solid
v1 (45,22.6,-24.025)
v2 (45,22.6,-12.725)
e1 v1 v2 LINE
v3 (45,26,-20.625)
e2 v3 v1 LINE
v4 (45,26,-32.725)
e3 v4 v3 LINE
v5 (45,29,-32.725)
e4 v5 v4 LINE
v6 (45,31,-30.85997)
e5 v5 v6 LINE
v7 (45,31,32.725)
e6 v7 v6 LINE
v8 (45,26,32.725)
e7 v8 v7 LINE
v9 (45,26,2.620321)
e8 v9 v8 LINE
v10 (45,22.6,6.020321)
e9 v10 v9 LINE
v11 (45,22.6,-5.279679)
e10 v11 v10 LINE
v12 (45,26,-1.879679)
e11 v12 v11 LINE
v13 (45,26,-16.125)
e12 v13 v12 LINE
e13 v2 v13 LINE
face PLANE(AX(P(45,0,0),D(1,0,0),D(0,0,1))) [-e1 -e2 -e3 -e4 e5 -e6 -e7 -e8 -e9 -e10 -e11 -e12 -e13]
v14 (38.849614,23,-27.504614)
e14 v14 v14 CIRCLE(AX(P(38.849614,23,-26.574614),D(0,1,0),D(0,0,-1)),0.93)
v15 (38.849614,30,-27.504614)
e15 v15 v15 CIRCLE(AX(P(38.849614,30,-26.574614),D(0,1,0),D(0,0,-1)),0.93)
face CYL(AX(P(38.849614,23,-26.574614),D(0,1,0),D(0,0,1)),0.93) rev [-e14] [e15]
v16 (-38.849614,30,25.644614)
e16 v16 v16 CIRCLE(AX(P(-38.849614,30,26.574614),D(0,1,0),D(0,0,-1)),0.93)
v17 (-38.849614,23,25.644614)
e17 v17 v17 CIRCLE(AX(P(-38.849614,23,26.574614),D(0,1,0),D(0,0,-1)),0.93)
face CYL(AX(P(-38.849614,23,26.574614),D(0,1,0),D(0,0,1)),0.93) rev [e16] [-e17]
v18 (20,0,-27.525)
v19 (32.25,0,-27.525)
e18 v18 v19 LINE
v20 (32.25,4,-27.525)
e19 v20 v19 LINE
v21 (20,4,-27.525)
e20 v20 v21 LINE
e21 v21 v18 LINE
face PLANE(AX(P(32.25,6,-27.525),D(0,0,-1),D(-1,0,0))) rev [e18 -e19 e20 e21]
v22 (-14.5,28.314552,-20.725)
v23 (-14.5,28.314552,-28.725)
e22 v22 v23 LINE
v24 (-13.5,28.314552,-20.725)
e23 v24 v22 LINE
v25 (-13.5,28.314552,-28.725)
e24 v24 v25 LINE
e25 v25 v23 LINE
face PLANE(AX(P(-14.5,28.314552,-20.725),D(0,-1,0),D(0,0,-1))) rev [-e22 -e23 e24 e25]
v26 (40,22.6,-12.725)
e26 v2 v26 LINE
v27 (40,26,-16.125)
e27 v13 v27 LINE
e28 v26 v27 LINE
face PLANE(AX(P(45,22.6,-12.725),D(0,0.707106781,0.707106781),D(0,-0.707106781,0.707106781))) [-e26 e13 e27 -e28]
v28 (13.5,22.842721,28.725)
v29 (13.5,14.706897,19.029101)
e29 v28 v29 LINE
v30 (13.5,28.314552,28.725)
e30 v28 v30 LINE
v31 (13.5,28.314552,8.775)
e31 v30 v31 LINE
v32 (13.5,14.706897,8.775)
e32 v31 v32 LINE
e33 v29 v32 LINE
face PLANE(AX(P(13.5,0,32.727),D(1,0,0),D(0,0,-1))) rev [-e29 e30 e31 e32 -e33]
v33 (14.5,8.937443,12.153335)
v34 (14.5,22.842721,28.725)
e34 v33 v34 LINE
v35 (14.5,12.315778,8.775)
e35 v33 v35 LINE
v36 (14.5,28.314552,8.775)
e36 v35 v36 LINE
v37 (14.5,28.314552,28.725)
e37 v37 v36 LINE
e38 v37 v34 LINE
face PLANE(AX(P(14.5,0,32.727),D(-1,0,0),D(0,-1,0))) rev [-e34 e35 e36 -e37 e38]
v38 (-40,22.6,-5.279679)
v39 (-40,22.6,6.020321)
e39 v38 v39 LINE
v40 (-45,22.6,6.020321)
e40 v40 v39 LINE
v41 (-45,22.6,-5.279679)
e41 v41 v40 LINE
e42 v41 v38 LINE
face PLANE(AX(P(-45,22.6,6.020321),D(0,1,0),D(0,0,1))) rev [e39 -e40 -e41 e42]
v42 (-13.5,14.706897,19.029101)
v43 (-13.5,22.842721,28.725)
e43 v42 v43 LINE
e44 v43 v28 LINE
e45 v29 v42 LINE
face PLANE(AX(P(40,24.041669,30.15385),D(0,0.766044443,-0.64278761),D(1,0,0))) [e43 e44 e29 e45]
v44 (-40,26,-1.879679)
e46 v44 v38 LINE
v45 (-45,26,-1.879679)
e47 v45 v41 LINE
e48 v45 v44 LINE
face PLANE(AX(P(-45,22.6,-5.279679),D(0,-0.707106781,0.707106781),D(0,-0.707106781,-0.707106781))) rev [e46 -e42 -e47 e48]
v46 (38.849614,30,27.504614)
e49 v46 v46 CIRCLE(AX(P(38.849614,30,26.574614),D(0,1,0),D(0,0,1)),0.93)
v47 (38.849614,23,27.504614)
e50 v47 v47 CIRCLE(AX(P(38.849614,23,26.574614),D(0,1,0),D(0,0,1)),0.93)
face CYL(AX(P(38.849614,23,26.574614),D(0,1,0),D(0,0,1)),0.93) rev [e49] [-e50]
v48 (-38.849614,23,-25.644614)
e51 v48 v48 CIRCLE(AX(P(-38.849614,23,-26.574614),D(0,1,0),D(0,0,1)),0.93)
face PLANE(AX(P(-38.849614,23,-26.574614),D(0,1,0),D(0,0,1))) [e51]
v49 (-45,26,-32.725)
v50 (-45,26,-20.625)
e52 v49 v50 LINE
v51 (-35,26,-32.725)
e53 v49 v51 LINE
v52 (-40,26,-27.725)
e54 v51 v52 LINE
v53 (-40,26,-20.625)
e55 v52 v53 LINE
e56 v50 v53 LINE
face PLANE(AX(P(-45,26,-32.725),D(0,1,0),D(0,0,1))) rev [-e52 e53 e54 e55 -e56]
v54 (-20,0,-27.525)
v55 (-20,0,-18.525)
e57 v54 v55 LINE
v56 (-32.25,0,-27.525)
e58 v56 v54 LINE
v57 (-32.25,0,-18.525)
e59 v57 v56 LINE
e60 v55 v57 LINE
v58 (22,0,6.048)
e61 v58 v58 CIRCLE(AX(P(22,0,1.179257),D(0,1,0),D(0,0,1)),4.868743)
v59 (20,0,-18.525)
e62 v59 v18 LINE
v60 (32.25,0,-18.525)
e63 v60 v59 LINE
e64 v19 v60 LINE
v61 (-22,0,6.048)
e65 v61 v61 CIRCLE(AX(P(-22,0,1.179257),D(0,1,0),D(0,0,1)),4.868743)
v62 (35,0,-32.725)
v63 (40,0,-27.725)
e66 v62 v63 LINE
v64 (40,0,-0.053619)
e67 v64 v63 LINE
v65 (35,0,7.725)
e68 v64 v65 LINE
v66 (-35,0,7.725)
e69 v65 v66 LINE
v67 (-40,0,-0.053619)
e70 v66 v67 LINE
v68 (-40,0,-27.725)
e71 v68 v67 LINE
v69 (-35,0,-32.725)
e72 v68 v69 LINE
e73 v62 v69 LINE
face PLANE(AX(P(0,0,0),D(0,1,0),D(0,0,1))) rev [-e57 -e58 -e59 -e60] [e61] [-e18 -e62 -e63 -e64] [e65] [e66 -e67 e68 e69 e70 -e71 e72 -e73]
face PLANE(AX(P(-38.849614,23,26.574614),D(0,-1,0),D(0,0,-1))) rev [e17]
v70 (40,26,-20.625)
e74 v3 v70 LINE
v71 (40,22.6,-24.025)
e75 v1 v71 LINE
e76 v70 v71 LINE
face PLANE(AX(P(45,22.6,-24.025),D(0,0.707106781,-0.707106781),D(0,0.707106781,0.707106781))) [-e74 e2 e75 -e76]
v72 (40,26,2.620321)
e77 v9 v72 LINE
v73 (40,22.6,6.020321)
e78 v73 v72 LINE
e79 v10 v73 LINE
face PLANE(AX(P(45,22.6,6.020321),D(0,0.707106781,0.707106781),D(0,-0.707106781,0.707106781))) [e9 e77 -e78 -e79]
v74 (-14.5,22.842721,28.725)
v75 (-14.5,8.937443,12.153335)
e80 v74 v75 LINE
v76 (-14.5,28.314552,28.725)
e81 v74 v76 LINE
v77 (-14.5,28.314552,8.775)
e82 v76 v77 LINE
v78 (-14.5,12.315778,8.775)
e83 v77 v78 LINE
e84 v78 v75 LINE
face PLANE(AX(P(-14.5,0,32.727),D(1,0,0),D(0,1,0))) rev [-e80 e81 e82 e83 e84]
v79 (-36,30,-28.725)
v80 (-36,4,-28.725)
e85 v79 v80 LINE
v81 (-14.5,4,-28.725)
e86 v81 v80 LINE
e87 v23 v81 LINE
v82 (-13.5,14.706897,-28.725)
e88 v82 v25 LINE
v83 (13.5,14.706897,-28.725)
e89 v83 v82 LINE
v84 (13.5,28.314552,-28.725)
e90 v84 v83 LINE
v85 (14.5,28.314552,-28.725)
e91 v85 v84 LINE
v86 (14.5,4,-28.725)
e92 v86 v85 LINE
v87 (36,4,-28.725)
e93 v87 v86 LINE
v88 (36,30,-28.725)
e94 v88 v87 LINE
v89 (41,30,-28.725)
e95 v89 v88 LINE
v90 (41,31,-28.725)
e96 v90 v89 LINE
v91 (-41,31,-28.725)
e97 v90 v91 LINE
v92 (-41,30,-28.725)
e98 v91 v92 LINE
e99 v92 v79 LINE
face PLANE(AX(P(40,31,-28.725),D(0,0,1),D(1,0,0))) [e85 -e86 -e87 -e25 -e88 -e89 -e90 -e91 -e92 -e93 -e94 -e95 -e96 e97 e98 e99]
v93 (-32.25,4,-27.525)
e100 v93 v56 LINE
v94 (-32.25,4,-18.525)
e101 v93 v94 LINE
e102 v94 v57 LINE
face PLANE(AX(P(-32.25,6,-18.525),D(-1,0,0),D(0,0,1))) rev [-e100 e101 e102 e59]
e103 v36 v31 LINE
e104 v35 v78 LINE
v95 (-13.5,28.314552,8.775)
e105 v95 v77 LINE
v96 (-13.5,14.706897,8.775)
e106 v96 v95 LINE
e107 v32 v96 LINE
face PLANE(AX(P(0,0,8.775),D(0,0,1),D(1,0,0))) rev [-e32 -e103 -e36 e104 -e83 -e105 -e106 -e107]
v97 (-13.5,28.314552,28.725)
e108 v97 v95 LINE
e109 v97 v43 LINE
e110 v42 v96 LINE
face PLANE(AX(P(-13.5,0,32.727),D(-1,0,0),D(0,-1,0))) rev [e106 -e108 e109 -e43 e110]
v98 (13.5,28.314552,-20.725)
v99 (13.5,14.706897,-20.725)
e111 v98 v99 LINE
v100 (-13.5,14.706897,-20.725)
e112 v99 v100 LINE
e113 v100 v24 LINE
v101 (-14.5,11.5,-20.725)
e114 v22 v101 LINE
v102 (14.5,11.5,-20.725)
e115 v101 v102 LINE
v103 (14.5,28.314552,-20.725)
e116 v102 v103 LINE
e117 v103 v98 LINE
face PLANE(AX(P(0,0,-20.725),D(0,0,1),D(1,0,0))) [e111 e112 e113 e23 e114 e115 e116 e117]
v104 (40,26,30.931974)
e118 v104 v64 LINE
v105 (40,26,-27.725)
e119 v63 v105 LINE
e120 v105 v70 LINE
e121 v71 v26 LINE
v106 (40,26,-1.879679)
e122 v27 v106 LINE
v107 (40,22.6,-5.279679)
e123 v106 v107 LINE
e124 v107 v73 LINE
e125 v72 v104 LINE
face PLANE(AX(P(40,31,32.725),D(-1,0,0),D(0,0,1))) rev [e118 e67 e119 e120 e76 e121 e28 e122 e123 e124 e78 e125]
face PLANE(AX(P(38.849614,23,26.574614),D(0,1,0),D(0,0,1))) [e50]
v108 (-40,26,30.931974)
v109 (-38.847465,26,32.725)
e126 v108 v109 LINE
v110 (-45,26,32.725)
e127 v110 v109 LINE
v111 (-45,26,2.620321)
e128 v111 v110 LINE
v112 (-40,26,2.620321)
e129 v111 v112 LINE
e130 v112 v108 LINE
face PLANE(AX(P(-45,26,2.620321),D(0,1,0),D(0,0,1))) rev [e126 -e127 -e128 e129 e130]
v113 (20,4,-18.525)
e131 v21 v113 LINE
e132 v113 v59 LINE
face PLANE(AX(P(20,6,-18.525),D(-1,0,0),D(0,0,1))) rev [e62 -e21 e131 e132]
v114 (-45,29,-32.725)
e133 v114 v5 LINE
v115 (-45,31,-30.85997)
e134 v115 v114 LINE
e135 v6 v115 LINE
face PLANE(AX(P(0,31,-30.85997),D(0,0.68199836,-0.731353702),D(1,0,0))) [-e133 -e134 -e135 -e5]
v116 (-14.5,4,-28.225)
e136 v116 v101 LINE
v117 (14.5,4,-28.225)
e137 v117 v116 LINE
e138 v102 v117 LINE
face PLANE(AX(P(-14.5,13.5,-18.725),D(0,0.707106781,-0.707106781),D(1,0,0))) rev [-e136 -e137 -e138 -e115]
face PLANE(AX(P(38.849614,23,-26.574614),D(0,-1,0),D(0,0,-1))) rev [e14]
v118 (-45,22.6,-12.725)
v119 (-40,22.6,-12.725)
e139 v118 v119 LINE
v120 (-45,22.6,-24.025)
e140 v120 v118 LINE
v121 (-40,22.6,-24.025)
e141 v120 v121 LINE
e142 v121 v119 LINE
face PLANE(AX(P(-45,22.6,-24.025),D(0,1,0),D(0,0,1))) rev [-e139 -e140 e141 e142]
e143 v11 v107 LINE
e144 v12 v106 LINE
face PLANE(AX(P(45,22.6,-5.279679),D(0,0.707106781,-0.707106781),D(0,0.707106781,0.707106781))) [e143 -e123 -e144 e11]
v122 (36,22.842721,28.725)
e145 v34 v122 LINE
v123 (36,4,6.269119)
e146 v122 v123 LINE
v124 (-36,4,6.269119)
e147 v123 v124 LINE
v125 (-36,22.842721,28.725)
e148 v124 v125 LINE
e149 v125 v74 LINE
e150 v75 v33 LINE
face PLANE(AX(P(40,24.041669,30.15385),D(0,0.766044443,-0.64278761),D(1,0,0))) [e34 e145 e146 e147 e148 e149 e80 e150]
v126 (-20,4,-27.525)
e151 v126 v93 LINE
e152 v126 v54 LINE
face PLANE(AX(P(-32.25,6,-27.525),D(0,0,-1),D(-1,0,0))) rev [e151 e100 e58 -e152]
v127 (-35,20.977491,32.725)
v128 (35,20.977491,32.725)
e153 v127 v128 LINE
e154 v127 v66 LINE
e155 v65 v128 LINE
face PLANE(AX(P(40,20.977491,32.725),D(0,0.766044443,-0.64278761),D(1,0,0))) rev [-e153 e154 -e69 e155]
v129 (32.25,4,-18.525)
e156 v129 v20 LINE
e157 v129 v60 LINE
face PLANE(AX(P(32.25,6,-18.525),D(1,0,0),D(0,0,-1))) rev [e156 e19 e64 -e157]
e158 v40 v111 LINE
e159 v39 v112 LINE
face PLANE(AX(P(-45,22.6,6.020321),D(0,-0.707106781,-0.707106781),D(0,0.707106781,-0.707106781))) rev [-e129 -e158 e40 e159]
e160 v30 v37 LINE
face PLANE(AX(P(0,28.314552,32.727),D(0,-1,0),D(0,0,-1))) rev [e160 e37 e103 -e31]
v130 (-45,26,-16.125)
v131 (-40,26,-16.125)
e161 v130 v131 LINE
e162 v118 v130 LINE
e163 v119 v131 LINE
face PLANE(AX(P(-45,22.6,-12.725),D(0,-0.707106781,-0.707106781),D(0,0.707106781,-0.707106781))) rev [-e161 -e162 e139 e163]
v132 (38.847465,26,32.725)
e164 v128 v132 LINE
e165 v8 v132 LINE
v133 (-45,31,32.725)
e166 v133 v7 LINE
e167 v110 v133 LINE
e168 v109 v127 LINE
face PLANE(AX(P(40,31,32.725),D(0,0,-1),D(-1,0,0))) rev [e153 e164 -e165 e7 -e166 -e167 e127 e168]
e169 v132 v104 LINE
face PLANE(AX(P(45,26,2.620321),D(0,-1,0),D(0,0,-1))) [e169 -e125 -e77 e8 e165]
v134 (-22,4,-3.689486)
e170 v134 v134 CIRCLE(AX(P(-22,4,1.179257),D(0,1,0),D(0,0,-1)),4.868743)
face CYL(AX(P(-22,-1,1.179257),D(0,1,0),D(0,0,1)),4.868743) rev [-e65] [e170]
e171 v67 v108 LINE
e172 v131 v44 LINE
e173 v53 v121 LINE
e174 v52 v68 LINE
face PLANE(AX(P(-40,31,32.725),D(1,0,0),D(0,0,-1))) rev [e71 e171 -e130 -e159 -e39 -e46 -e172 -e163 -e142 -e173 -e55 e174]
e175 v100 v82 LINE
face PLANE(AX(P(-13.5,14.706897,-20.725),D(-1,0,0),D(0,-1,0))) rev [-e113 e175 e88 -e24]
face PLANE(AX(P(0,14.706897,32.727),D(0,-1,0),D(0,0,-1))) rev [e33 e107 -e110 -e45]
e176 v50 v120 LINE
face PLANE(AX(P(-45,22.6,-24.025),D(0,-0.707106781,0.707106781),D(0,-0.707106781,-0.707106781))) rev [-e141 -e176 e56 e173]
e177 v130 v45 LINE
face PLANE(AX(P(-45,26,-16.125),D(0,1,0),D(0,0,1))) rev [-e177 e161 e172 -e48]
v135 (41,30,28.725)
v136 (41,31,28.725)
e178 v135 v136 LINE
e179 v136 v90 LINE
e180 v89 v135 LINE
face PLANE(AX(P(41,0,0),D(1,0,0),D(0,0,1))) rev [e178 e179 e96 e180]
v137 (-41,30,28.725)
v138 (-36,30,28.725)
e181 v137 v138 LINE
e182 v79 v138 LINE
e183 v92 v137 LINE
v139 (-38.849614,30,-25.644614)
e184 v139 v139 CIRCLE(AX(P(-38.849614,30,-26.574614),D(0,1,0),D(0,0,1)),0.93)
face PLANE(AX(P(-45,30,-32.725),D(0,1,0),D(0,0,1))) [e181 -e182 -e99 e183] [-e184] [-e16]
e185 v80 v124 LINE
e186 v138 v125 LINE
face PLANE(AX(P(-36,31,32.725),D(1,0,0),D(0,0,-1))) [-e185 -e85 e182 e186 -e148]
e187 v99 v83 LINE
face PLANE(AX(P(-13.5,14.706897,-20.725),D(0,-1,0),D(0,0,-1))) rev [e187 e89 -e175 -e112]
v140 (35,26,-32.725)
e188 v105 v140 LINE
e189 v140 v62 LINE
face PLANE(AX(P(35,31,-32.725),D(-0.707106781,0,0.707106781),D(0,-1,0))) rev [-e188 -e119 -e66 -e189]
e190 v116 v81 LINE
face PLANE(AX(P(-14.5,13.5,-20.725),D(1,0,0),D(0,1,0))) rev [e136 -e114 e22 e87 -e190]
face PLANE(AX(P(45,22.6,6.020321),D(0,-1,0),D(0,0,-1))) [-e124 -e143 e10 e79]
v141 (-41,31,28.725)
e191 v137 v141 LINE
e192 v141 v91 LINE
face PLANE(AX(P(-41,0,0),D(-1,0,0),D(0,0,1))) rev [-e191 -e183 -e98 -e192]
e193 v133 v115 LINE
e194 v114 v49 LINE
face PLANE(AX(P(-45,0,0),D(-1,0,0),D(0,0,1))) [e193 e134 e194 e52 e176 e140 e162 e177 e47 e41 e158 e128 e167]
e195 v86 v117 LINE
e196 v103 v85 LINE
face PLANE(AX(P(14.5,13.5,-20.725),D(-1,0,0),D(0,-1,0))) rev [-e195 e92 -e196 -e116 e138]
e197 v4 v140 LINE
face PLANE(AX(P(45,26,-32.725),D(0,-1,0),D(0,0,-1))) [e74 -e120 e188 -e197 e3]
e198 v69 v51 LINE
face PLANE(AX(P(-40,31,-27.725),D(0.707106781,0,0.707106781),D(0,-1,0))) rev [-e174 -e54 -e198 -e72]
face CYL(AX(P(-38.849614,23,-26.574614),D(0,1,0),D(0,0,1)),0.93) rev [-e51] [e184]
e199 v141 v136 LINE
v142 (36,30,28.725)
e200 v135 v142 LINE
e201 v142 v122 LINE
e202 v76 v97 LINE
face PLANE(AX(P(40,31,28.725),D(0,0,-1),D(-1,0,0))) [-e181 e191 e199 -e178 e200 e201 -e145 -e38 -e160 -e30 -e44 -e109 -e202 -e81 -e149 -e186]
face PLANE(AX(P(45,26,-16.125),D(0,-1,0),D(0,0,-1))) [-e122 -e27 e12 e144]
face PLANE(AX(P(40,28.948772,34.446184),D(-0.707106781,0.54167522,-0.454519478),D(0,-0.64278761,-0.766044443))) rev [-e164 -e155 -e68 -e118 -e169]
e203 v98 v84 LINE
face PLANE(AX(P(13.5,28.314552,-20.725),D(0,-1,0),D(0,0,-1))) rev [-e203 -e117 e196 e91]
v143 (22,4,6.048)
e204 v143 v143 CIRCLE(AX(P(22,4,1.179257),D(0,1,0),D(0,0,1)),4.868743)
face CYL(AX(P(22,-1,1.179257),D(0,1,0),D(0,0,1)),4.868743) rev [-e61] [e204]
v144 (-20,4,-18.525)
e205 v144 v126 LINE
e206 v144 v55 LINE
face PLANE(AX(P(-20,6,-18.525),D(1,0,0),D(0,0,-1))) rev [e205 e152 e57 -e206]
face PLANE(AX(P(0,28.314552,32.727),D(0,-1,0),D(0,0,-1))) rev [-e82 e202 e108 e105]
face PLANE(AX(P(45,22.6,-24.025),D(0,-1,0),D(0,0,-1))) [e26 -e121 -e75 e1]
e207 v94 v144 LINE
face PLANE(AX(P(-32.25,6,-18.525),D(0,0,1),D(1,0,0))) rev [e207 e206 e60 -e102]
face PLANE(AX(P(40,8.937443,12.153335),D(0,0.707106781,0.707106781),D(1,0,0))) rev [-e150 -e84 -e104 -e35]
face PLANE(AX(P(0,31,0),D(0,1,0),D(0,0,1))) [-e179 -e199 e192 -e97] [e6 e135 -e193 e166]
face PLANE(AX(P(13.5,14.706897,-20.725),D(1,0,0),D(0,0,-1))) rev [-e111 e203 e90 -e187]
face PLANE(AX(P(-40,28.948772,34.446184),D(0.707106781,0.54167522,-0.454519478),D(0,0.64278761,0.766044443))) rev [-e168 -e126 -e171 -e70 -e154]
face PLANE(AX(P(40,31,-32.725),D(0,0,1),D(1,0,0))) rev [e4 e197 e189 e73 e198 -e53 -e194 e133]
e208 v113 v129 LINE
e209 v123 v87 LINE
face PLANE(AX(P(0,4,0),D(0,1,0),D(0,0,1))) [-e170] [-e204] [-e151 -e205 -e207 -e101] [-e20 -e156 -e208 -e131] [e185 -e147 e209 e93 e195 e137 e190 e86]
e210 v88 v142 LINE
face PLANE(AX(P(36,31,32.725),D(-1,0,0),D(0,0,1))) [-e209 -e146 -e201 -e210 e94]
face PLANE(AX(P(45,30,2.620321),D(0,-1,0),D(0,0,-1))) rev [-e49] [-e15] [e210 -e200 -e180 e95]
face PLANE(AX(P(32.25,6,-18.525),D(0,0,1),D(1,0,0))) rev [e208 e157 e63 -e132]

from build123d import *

# Parameters (mm, degrees)
SKETCH1_W           = 80
SKETCH1_H           = 65.45
BOSS_EXTRUDE1_DEPTH = 31
BOSS_EXTRUDE3_DEPTH = 5
CHAMFER2_SIZE       = 25
CHAMFER2_SIZE2      = 20.977490779
SHELL2_START        = -36
SHELL2_DEPTH        = 72
SHELL2_START_2      = -41
SHELL2_2_OUTLINE_W  = 1
SHELL2_2_OUTLINE_H  = 57.45
SHELL2_2_DEPTH      = 82
SKETCH6_R           = 4.86874318
CUT_EXTRUDE1_DEPTH  = 5
BOSS_EXTRUDE4_DEPTH = 8
BOSS_EXTRUDE5_REACH = 107.939
BOSS_EXTRUDE5_START = 29.5
SKETCH10_W          = 12.25
SKETCH10_H          = 9
CUT_EXTRUDE2_DEPTH  = 6
CHAMFER3_SIZE       = 2
CHAMFER3_SIZE2      = 1.865030172
CHAMFER4_SIZE       = 7.098078142
CHAMFER4_SIZE_2     = 10
CHAMFER5_SIZE       = 10
CHAMFER7_SIZE       = 5
SKETCH11_R          = 0.93
CUT_EXTRUDE3_DEPTH  = 7


# Read off the part's stored shape, not the designer's step: Shell2
with BuildPart() as part:
    # Sketch1 → Boss-Extrude1 (new body)
    with BuildSketch(Plane(origin=(0, 0, 0), x_dir=(1, 0, 0), z_dir=(0, 1, 0))):
        Rectangle(SKETCH1_W, SKETCH1_H)
    extrude(amount=BOSS_EXTRUDE1_DEPTH)

    # Sketch5 → Boss-Extrude3 (add)
    with BuildSketch(Plane.ZY.offset(40)):
        Polygon((-32.725, 31), (-20.625, 31), (8.005, 31), (32.725, 31), (32.725, 26), (2.6203214, 26), (6.0203214, 22.6), (-5.2796786, 22.6), (-1.8796786, 26), (-16.125, 26), (-12.725, 22.6), (-24.025, 22.6), (-20.625, 26), (-32.725, 26), align=None)
    boss_extrude3 = extrude(amount=BOSS_EXTRUDE3_DEPTH)

    # Mirror1: Boss-Extrude3 across plane
    add(boss_extrude3.mirror(Plane(origin=(0, 0, 0), x_dir=(0, 0, 1), z_dir=(1, 0, 0))))

    # Chamfer2
    chamfer2_edges = [part.edges().sort_by_distance(p)[0] for p in [
        (0, 0, 32.725),
    ]]
    chamfer2_side = [part.faces().sort_by_distance(p)[0] for p in [
        (0, 0, 0),
    ]]
    chamfer(chamfer2_edges, length=CHAMFER2_SIZE, length2=CHAMFER2_SIZE2, reference=chamfer2_side[0])

    # Shell2 outline → Shell2 (cut)
    with BuildSketch(Plane.YZ.offset(SHELL2_START)):
        Polygon((22.842721412, 28.725), (4, 6.269119063), (4, -28.725), (31, -28.725), (31, 28.725), align=None)
    extrude(amount=SHELL2_DEPTH, mode=Mode.SUBTRACT)

    # Shell2 2 outline → Shell2 2 (cut)
    with BuildSketch(Plane.YZ.offset(SHELL2_START_2)):
        with Locations((30.5, 0)):
            Rectangle(SHELL2_2_OUTLINE_W, SHELL2_2_OUTLINE_H)
    extrude(amount=SHELL2_2_DEPTH, mode=Mode.SUBTRACT)

    # Sketch6 → Cut-Extrude1 (cut)
    with BuildSketch(Plane(origin=(0, 4, 24.632603001), x_dir=(1, 0, 0), z_dir=(0, 1, 0))):
        with Locations(Location((22, 23.453346141, 0), (0, 0, 270))):
            Circle(SKETCH6_R)
        with Locations(Location((-22, 23.453346141, 0), (0, 0, 270))):
            Circle(SKETCH6_R)
    extrude(amount=-CUT_EXTRUDE1_DEPTH, mode=Mode.SUBTRACT)

    # Sketch7 → Boss-Extrude4 (add)
    with BuildSketch(Plane.XY.offset(-28.725)):
        Polygon((-14.5, 13.5), (14.5, 13.5), (14.5, 28.31455183), (13.5, 28.31455183), (13.5, 14.706896552), (-13.5, 14.706896552), (-13.5, 28.31455183), (-14.5, 28.31455183), align=None)
    extrude(amount=BOSS_EXTRUDE4_DEPTH)

    # Sketch8 → Boss-Extrude5 (add, up to next)
    with BuildSketch(Plane.XY.offset(-20.725).offset(BOSS_EXTRUDE5_START), mode=Mode.PRIVATE) as boss_extrude5_sk1:
        Polygon((-13.5, 14.706896552), (-13.5, 28.31455183), (-14.5, 28.31455183), (-14.5, 14.706896552), (-14.5, 13.5), (-13.5, 13.5), (13.5, 13.5), (14.5, 13.5), (14.5, 14.706896552), (14.5, 28.31455183), (13.5, 28.31455183), (13.5, 14.706896552), align=None)
    boss_extrude5_tool1 = extrude(boss_extrude5_sk1.sketch, amount=BOSS_EXTRUDE5_REACH, mode=Mode.PRIVATE) - part.part
    add(boss_extrude5_tool1.solids().sort_by_distance((-14.174351, 21.510724, 8.775))[0])

    # Sketch10 → Cut-Extrude2 (cut)
    with BuildSketch(Plane.XZ):
        with Locations((-26.125, -23.025)):
            Rectangle(SKETCH10_W, SKETCH10_H)
        with Locations((26.125, -23.025)):
            Rectangle(SKETCH10_W, SKETCH10_H)
    extrude(amount=-CUT_EXTRUDE2_DEPTH, mode=Mode.SUBTRACT)

    # Chamfer3
    chamfer3_edges = [part.edges().sort_by_distance(p)[0] for p in [
        (0, 31, -32.725),
    ]]
    chamfer3_side = [part.faces().sort_by_distance(p)[0] for p in [
        (0, 15.756916996, -32.725),
    ]]
    chamfer(chamfer3_edges, length=CHAMFER3_SIZE, length2=CHAMFER3_SIZE2, reference=chamfer3_side[0])

    # Chamfer4
    # the kernel refuses this chamfer: 10, 7.098078142 mm, written as the material it adds along each edge
    with BuildSketch(Plane(origin=(14.5, 13.5, 17.590778193), x_dir=(0, -0.6849156240265527, -0.728622390518105), z_dir=(-1, 0, 0))) as chamfer4_piece_1_section:
        Polygon((CHAMFER4_SIZE * 0.998412410217, -CHAMFER4_SIZE * 0.0563263630269), (CHAMFER4_SIZE_2 * 0.728622390518, -CHAMFER4_SIZE_2 * 0.684915624027), (0, 0), align=None)
    chamfer4_piece_1 = extrude(amount=29, mode=Mode.PRIVATE)
    chamfer4_piece_1 = split(chamfer4_piece_1, bisect_by=Plane(origin=(0, 11.943437141, 8.775), z_dir=(0, 0, 1)), keep=Keep.TOP, mode=Mode.PRIVATE)
    add(chamfer4_piece_1)

    # Chamfer5
    # the kernel refuses this chamfer: 10 mm, written as the material it adds along each edge
    with BuildSketch(Plane(origin=(-14.5, 13.5, -28.725), x_dir=(0, -0.9996219169112968, -0.02749587661058701), z_dir=(1, 0, 0))) as chamfer5_piece_1_section:
        Polygon((CHAMFER5_SIZE * 0.999621916911, -CHAMFER5_SIZE * 0.0274958766106), (-CHAMFER5_SIZE * 0.0274958766106, -CHAMFER5_SIZE * 0.999621916911), (0, 0), align=None)
    chamfer5_piece_1 = extrude(amount=29, mode=Mode.PRIVATE)
    chamfer5_piece_1 = split(chamfer5_piece_1, bisect_by=Plane(origin=(0, 10.042815877, -20.725), z_dir=(0, 0, -1)), keep=Keep.TOP, mode=Mode.PRIVATE)
    add(chamfer5_piece_1)

    # Chamfer7
    chamfer7_edges = [part.edges().sort_by_distance(p)[0] for p in [
        (40, 10.48874539, 20.225),
        (-40, 10.48874539, 20.225),
        (-40, 13, -32.725),
        (40, 13, -32.725),
    ]]
    chamfer(chamfer7_edges, length=CHAMFER7_SIZE)

    # Sketch11 → Cut-Extrude3 (cut)
    with BuildSketch(Plane(origin=(0, 30, 0), x_dir=(1, 0, 0), z_dir=(0, 1, 0))):
        with Locations(Location((38.849613738, -26.574613738, 0), (0, 0, 270))):
            Circle(SKETCH11_R)
        with Locations(Location((38.849613738, 26.574613738, 0), (0, 0, 90))):
            Circle(SKETCH11_R)
        with Locations(Location((-38.849613738, 26.574613738, 0), (0, 0, 270))):
            Circle(SKETCH11_R)
        with Locations(Location((-38.849613738, -26.574613738, 0), (0, 0, 90))):
            Circle(SKETCH11_R)
    extrude(amount=-CUT_EXTRUDE3_DEPTH, mode=Mode.SUBTRACT)


solid = part.part
